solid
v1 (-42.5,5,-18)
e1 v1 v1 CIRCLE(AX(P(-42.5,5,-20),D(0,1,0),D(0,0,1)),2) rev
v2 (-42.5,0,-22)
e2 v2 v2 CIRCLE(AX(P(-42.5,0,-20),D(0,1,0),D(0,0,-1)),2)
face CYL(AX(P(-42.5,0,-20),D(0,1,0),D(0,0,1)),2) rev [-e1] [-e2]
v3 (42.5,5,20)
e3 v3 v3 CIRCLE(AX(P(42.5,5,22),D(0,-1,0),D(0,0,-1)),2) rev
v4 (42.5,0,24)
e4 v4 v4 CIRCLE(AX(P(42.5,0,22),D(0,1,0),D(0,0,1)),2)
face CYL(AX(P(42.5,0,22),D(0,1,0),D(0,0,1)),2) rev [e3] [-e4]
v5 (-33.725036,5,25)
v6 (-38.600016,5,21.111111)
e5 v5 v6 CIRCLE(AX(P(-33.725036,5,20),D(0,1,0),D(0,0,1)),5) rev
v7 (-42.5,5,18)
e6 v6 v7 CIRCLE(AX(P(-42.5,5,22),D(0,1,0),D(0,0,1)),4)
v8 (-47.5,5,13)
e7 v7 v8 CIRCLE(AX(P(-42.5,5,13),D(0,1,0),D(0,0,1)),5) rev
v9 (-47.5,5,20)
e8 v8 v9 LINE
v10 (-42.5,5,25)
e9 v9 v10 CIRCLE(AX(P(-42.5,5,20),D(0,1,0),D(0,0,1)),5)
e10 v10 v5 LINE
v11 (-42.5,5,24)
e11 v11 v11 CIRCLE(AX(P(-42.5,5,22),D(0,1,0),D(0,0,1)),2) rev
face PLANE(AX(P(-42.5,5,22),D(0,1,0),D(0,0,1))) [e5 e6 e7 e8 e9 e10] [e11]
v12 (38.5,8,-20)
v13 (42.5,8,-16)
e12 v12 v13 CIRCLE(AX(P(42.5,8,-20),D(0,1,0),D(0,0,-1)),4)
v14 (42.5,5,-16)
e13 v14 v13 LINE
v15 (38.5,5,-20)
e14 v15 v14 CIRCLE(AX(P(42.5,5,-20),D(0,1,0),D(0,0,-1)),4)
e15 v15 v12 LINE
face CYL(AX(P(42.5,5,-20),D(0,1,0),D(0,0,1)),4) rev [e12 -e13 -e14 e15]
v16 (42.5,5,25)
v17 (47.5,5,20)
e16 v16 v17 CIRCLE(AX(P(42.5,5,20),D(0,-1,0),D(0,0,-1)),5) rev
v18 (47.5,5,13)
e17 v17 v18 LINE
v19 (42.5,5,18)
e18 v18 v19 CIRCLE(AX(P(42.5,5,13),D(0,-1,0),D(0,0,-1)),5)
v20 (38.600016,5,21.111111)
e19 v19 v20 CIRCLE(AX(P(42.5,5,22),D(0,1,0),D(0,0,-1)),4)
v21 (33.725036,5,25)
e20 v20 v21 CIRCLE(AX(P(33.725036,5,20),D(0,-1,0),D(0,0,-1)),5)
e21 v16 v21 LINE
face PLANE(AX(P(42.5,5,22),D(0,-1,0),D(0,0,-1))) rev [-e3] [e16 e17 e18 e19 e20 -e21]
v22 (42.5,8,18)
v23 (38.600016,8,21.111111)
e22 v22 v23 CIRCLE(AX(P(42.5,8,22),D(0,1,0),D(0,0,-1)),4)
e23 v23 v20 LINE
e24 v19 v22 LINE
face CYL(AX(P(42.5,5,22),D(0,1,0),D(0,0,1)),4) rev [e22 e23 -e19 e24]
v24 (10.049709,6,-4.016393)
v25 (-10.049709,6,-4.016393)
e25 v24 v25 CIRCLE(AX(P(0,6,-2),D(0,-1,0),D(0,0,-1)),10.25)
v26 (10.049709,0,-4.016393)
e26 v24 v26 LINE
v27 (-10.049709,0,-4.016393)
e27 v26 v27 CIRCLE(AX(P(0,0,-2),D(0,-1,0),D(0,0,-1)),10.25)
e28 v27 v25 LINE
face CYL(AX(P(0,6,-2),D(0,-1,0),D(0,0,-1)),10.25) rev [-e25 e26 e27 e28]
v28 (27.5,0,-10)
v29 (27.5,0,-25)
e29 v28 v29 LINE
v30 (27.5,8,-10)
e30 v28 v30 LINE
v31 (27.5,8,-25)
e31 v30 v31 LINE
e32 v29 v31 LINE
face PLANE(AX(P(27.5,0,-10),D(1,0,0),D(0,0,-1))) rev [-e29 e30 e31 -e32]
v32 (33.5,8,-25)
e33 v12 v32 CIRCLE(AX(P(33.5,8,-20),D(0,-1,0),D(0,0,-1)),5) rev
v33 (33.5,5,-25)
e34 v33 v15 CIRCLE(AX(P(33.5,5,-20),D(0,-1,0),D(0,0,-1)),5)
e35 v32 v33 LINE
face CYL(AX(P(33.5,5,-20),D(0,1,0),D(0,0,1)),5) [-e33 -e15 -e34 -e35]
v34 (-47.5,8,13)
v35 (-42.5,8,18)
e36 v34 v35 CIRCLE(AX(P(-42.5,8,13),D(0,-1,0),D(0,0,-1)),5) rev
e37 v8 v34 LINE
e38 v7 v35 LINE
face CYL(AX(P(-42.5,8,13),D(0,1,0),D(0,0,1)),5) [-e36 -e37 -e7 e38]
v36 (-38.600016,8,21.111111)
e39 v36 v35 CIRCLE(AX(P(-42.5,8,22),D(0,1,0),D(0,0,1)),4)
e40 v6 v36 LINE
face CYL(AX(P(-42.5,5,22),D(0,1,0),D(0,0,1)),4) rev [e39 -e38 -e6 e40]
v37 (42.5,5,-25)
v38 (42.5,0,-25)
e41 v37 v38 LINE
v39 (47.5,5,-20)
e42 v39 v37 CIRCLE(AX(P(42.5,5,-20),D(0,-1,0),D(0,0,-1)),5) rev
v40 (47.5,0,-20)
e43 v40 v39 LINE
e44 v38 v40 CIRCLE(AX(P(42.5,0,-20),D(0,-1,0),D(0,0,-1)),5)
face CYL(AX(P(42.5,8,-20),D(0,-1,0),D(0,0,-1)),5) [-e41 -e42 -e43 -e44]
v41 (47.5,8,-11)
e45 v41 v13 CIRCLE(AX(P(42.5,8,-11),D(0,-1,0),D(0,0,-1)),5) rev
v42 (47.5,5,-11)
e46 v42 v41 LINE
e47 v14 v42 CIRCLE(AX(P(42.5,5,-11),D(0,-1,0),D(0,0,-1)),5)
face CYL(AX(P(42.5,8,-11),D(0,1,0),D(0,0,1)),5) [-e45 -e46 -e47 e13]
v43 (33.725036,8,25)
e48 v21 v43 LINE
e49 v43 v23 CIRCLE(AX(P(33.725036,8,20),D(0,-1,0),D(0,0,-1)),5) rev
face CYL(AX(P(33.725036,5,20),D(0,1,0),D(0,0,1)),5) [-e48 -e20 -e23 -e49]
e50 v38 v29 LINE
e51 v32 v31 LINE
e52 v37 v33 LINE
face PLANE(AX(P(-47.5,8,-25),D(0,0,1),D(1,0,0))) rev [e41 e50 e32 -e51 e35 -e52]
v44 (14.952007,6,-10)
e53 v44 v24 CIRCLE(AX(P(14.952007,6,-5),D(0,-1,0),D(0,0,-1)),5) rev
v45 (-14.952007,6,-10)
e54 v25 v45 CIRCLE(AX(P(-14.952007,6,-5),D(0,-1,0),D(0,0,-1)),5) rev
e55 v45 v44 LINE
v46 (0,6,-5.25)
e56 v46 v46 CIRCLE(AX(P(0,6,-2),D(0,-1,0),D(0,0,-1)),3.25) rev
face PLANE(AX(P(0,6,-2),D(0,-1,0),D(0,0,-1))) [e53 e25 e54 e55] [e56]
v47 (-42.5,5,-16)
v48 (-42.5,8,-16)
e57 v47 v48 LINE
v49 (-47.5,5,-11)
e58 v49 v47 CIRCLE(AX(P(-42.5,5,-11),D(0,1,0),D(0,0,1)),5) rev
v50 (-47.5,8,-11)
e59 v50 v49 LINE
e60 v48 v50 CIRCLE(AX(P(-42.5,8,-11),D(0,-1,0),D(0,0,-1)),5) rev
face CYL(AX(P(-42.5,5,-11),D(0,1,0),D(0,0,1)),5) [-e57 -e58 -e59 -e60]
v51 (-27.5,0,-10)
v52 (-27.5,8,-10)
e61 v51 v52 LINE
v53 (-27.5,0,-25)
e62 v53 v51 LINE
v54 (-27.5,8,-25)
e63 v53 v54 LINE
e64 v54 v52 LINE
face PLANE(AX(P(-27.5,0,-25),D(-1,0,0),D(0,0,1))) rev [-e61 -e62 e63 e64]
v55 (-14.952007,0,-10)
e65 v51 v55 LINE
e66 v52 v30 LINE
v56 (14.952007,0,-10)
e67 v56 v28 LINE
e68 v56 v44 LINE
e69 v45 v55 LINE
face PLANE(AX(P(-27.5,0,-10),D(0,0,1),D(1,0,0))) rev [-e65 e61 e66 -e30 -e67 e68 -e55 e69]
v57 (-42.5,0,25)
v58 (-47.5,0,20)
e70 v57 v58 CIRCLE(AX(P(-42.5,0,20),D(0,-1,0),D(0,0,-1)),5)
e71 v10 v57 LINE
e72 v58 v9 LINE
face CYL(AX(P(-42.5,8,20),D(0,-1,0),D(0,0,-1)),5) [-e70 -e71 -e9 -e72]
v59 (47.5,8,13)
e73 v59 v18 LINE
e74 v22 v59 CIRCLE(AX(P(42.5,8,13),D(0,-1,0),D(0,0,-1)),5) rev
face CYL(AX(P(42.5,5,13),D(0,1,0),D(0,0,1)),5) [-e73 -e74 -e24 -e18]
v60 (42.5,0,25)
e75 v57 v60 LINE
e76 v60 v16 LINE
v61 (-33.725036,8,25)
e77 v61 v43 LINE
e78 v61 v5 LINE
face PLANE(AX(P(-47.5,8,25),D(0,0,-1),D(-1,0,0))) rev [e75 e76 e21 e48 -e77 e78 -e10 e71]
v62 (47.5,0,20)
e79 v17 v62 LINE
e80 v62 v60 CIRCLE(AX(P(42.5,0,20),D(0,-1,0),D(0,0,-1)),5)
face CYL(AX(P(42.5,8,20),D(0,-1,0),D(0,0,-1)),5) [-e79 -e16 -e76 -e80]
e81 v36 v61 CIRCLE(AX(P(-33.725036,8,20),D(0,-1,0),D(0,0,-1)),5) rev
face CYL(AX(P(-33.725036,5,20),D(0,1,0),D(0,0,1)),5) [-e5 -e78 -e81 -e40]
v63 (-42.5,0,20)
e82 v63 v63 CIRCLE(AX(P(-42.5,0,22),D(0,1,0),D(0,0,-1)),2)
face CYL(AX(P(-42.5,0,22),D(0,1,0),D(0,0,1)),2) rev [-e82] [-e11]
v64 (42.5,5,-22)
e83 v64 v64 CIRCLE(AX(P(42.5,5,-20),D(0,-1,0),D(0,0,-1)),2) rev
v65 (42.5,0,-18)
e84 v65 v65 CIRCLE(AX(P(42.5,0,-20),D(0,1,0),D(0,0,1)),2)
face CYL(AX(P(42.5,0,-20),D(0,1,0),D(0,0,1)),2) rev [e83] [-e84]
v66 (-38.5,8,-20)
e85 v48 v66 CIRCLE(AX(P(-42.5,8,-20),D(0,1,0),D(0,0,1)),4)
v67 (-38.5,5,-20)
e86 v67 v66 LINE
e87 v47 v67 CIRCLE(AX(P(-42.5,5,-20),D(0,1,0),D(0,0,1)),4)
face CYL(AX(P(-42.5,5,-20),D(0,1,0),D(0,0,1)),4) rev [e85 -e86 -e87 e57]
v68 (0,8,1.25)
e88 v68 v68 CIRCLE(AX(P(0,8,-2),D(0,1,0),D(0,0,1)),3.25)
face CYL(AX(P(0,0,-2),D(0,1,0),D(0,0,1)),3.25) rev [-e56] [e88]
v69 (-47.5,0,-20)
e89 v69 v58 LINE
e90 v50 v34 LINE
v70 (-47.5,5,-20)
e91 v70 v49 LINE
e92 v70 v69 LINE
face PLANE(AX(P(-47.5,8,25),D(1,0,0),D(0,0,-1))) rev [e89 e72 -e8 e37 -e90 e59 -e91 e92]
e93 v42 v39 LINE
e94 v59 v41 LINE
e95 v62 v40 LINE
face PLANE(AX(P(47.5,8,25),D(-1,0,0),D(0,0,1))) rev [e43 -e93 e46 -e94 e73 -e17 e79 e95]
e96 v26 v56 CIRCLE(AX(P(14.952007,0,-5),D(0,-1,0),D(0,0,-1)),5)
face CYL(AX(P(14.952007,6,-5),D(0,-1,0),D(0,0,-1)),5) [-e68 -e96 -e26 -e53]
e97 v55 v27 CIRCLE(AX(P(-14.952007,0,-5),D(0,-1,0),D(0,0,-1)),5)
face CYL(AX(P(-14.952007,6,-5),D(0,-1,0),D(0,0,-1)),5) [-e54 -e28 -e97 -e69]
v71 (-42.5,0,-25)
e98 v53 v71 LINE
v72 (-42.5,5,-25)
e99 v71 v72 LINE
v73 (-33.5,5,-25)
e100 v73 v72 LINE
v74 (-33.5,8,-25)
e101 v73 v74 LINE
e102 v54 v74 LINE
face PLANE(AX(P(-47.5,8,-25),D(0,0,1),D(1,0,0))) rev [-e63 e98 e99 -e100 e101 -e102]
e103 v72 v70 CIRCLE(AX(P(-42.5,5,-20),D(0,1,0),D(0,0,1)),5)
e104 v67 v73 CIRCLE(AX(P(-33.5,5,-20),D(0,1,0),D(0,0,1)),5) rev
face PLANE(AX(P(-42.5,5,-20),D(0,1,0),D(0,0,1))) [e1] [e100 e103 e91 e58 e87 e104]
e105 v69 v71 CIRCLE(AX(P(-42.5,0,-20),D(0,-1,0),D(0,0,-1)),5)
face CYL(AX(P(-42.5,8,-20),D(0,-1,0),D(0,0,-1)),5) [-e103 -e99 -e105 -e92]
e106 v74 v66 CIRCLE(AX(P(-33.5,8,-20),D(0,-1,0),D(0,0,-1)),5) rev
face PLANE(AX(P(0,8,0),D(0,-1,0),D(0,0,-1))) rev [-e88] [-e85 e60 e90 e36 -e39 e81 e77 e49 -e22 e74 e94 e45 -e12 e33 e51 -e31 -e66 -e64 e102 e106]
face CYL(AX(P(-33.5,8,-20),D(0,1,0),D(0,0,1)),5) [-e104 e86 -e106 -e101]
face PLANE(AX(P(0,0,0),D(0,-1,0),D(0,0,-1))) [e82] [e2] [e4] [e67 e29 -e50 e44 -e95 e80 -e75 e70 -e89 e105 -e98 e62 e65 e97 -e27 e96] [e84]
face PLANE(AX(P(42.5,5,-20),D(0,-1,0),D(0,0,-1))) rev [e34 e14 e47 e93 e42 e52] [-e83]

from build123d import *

# Parameters (mm, degrees)
SKETCH1_W           = 95
SKETCH1_H           = 50
BOSS_EXTRUDE1_DEPTH = 8
SKETCH2_W           = 55
SKETCH2_H           = 15
CUT_EXTRUDE1_DEPTH  = 55.270157545
SKETCH3_R           = 3.25
CUT_EXTRUDE2_DEPTH  = 55.270157545
SKETCH4_R           = 10.25
CUT_EXTRUDE3_DEPTH  = 6
FILLET1_R           = 5
SKETCH5_R           = 2
CUT_EXTRUDE4_DEPTH  = 55.270157545
CUT_EXTRUDE5_DEPTH  = 3
FILLET2_R           = 5


with BuildPart() as part:
    # Sketch1 → Boss-Extrude1 (new body)
    with BuildSketch(Plane(origin=(0, 0, 0), x_dir=(1, 0, 0), z_dir=(0, 1, 0))):
        Rectangle(SKETCH1_W, SKETCH1_H)
    extrude(amount=BOSS_EXTRUDE1_DEPTH)

    # Sketch2 → Cut-Extrude1 (cut, through all)
    with BuildSketch(Plane(origin=(0, 8, 0), x_dir=(1, 0, 0), z_dir=(0, 1, 0))):
        with Locations((0, 17.5)):
            Rectangle(SKETCH2_W, SKETCH2_H)
    extrude(amount=-CUT_EXTRUDE1_DEPTH, mode=Mode.SUBTRACT)

    # Sketch3 → Cut-Extrude2 (cut, through all)
    with BuildSketch(Plane(origin=(0, 8, 0), x_dir=(1, 0, 0), z_dir=(0, 1, 0))):
        with Locations(Location((0, 2, 0), (0, 0, 270))):
            Circle(SKETCH3_R)
    extrude(amount=-CUT_EXTRUDE2_DEPTH, mode=Mode.SUBTRACT)

    # Sketch4 → Cut-Extrude3 (cut)
    with BuildSketch(Plane.XZ):
        with Locations((0, -2)):
            Circle(SKETCH4_R)
    extrude(amount=-CUT_EXTRUDE3_DEPTH, mode=Mode.SUBTRACT)

    # Fillet1
    fillet1_edges = [part.edges().sort_by_distance(p)[0] for p in [
        (6.408002809, 3, -10),
        (-6.408002809, 3, -10),
    ]]
    fillet(fillet1_edges, radius=FILLET1_R)

    # Sketch5 → Cut-Extrude4 (cut, through all)
    with BuildSketch(Plane(origin=(0, 8, 0), x_dir=(1, 0, 0), z_dir=(0, 1, 0))):
        with Locations(Location((42.5, 20, 0), (0, 0, 270))):
            Circle(SKETCH5_R)
        with Locations(Location((42.5, -22, 0), (0, 0, 270))):
            Circle(SKETCH5_R)
        with Locations(Location((-42.5, -22, 0), (0, 0, 90))):
            Circle(SKETCH5_R)
        with Locations(Location((-42.5, 20, 0), (0, 0, 90))):
            Circle(SKETCH5_R)
    extrude(amount=-CUT_EXTRUDE4_DEPTH, mode=Mode.SUBTRACT)

    # Sketch6 → Cut-Extrude5 (cut)
    with BuildSketch(Plane(origin=(0, 8, 0), x_dir=(1, 0, 0), z_dir=(0, 1, 0))):
        with BuildLine():
            Line((-42.5, -18), (-47.5, -18))
            Line((-47.5, -18), (-47.5, -25))
            Line((-47.5, -25), (-45.145751311, -25))
            ThreePointArc((-45.145751311, -25), (-38.758342613, -23.414213562), (-42.5, -18))
        make_face()
        with BuildLine():
            Line((47.5, -25), (45.145751311, -25))
            ThreePointArc((45.145751311, -25), (38.758342613, -23.414213562), (42.5, -18))
            Line((42.5, -18), (47.5, -18))
            Line((47.5, -18), (47.5, -25))
        make_face()
        with BuildLine():
            Line((-42.5, 16), (-47.5, 16))
            Line((-47.5, 16), (-47.5, 25))
            Line((-47.5, 25), (-38.5, 25))
            Line((-38.5, 25), (-38.5, 20))
            ThreePointArc((-38.5, 20), (-39.671572875, 17.171572875), (-42.5, 16))
        make_face()
        with BuildLine():
            Line((42.5, 16), (47.5, 16))
            Line((47.5, 16), (47.5, 25))
            Line((47.5, 25), (38.5, 25))
            Line((38.5, 25), (38.5, 20))
            ThreePointArc((38.5, 20), (39.671572875, 17.171572875), (42.5, 16))
        make_face()
    extrude(amount=-CUT_EXTRUDE5_DEPTH, mode=Mode.SUBTRACT)

    # Fillet2
    fillet2_edges = [part.edges().sort_by_distance(p)[0] for p in [
        (-47.5, 6.5, 18),
        (-39.854248689, 6.5, 25),
        (47.5, 6.5, 18),
        (39.854248689, 6.5, 25),
        (-47.5, 2.5, 25),
        (47.5, 2.5, 25),
        (47.5, 2.5, -25),
        (47.5, 6.5, -16),
        (38.5, 6.5, -25),
        (-47.5, 2.5, -25),
        (-38.5, 6.5, -25),
        (-47.5, 6.5, -16),
    ]]
    fillet(fillet2_edges, radius=FILLET2_R - 0.0001)  # a hair under: the kernel refuses the full size


solid = part.part
